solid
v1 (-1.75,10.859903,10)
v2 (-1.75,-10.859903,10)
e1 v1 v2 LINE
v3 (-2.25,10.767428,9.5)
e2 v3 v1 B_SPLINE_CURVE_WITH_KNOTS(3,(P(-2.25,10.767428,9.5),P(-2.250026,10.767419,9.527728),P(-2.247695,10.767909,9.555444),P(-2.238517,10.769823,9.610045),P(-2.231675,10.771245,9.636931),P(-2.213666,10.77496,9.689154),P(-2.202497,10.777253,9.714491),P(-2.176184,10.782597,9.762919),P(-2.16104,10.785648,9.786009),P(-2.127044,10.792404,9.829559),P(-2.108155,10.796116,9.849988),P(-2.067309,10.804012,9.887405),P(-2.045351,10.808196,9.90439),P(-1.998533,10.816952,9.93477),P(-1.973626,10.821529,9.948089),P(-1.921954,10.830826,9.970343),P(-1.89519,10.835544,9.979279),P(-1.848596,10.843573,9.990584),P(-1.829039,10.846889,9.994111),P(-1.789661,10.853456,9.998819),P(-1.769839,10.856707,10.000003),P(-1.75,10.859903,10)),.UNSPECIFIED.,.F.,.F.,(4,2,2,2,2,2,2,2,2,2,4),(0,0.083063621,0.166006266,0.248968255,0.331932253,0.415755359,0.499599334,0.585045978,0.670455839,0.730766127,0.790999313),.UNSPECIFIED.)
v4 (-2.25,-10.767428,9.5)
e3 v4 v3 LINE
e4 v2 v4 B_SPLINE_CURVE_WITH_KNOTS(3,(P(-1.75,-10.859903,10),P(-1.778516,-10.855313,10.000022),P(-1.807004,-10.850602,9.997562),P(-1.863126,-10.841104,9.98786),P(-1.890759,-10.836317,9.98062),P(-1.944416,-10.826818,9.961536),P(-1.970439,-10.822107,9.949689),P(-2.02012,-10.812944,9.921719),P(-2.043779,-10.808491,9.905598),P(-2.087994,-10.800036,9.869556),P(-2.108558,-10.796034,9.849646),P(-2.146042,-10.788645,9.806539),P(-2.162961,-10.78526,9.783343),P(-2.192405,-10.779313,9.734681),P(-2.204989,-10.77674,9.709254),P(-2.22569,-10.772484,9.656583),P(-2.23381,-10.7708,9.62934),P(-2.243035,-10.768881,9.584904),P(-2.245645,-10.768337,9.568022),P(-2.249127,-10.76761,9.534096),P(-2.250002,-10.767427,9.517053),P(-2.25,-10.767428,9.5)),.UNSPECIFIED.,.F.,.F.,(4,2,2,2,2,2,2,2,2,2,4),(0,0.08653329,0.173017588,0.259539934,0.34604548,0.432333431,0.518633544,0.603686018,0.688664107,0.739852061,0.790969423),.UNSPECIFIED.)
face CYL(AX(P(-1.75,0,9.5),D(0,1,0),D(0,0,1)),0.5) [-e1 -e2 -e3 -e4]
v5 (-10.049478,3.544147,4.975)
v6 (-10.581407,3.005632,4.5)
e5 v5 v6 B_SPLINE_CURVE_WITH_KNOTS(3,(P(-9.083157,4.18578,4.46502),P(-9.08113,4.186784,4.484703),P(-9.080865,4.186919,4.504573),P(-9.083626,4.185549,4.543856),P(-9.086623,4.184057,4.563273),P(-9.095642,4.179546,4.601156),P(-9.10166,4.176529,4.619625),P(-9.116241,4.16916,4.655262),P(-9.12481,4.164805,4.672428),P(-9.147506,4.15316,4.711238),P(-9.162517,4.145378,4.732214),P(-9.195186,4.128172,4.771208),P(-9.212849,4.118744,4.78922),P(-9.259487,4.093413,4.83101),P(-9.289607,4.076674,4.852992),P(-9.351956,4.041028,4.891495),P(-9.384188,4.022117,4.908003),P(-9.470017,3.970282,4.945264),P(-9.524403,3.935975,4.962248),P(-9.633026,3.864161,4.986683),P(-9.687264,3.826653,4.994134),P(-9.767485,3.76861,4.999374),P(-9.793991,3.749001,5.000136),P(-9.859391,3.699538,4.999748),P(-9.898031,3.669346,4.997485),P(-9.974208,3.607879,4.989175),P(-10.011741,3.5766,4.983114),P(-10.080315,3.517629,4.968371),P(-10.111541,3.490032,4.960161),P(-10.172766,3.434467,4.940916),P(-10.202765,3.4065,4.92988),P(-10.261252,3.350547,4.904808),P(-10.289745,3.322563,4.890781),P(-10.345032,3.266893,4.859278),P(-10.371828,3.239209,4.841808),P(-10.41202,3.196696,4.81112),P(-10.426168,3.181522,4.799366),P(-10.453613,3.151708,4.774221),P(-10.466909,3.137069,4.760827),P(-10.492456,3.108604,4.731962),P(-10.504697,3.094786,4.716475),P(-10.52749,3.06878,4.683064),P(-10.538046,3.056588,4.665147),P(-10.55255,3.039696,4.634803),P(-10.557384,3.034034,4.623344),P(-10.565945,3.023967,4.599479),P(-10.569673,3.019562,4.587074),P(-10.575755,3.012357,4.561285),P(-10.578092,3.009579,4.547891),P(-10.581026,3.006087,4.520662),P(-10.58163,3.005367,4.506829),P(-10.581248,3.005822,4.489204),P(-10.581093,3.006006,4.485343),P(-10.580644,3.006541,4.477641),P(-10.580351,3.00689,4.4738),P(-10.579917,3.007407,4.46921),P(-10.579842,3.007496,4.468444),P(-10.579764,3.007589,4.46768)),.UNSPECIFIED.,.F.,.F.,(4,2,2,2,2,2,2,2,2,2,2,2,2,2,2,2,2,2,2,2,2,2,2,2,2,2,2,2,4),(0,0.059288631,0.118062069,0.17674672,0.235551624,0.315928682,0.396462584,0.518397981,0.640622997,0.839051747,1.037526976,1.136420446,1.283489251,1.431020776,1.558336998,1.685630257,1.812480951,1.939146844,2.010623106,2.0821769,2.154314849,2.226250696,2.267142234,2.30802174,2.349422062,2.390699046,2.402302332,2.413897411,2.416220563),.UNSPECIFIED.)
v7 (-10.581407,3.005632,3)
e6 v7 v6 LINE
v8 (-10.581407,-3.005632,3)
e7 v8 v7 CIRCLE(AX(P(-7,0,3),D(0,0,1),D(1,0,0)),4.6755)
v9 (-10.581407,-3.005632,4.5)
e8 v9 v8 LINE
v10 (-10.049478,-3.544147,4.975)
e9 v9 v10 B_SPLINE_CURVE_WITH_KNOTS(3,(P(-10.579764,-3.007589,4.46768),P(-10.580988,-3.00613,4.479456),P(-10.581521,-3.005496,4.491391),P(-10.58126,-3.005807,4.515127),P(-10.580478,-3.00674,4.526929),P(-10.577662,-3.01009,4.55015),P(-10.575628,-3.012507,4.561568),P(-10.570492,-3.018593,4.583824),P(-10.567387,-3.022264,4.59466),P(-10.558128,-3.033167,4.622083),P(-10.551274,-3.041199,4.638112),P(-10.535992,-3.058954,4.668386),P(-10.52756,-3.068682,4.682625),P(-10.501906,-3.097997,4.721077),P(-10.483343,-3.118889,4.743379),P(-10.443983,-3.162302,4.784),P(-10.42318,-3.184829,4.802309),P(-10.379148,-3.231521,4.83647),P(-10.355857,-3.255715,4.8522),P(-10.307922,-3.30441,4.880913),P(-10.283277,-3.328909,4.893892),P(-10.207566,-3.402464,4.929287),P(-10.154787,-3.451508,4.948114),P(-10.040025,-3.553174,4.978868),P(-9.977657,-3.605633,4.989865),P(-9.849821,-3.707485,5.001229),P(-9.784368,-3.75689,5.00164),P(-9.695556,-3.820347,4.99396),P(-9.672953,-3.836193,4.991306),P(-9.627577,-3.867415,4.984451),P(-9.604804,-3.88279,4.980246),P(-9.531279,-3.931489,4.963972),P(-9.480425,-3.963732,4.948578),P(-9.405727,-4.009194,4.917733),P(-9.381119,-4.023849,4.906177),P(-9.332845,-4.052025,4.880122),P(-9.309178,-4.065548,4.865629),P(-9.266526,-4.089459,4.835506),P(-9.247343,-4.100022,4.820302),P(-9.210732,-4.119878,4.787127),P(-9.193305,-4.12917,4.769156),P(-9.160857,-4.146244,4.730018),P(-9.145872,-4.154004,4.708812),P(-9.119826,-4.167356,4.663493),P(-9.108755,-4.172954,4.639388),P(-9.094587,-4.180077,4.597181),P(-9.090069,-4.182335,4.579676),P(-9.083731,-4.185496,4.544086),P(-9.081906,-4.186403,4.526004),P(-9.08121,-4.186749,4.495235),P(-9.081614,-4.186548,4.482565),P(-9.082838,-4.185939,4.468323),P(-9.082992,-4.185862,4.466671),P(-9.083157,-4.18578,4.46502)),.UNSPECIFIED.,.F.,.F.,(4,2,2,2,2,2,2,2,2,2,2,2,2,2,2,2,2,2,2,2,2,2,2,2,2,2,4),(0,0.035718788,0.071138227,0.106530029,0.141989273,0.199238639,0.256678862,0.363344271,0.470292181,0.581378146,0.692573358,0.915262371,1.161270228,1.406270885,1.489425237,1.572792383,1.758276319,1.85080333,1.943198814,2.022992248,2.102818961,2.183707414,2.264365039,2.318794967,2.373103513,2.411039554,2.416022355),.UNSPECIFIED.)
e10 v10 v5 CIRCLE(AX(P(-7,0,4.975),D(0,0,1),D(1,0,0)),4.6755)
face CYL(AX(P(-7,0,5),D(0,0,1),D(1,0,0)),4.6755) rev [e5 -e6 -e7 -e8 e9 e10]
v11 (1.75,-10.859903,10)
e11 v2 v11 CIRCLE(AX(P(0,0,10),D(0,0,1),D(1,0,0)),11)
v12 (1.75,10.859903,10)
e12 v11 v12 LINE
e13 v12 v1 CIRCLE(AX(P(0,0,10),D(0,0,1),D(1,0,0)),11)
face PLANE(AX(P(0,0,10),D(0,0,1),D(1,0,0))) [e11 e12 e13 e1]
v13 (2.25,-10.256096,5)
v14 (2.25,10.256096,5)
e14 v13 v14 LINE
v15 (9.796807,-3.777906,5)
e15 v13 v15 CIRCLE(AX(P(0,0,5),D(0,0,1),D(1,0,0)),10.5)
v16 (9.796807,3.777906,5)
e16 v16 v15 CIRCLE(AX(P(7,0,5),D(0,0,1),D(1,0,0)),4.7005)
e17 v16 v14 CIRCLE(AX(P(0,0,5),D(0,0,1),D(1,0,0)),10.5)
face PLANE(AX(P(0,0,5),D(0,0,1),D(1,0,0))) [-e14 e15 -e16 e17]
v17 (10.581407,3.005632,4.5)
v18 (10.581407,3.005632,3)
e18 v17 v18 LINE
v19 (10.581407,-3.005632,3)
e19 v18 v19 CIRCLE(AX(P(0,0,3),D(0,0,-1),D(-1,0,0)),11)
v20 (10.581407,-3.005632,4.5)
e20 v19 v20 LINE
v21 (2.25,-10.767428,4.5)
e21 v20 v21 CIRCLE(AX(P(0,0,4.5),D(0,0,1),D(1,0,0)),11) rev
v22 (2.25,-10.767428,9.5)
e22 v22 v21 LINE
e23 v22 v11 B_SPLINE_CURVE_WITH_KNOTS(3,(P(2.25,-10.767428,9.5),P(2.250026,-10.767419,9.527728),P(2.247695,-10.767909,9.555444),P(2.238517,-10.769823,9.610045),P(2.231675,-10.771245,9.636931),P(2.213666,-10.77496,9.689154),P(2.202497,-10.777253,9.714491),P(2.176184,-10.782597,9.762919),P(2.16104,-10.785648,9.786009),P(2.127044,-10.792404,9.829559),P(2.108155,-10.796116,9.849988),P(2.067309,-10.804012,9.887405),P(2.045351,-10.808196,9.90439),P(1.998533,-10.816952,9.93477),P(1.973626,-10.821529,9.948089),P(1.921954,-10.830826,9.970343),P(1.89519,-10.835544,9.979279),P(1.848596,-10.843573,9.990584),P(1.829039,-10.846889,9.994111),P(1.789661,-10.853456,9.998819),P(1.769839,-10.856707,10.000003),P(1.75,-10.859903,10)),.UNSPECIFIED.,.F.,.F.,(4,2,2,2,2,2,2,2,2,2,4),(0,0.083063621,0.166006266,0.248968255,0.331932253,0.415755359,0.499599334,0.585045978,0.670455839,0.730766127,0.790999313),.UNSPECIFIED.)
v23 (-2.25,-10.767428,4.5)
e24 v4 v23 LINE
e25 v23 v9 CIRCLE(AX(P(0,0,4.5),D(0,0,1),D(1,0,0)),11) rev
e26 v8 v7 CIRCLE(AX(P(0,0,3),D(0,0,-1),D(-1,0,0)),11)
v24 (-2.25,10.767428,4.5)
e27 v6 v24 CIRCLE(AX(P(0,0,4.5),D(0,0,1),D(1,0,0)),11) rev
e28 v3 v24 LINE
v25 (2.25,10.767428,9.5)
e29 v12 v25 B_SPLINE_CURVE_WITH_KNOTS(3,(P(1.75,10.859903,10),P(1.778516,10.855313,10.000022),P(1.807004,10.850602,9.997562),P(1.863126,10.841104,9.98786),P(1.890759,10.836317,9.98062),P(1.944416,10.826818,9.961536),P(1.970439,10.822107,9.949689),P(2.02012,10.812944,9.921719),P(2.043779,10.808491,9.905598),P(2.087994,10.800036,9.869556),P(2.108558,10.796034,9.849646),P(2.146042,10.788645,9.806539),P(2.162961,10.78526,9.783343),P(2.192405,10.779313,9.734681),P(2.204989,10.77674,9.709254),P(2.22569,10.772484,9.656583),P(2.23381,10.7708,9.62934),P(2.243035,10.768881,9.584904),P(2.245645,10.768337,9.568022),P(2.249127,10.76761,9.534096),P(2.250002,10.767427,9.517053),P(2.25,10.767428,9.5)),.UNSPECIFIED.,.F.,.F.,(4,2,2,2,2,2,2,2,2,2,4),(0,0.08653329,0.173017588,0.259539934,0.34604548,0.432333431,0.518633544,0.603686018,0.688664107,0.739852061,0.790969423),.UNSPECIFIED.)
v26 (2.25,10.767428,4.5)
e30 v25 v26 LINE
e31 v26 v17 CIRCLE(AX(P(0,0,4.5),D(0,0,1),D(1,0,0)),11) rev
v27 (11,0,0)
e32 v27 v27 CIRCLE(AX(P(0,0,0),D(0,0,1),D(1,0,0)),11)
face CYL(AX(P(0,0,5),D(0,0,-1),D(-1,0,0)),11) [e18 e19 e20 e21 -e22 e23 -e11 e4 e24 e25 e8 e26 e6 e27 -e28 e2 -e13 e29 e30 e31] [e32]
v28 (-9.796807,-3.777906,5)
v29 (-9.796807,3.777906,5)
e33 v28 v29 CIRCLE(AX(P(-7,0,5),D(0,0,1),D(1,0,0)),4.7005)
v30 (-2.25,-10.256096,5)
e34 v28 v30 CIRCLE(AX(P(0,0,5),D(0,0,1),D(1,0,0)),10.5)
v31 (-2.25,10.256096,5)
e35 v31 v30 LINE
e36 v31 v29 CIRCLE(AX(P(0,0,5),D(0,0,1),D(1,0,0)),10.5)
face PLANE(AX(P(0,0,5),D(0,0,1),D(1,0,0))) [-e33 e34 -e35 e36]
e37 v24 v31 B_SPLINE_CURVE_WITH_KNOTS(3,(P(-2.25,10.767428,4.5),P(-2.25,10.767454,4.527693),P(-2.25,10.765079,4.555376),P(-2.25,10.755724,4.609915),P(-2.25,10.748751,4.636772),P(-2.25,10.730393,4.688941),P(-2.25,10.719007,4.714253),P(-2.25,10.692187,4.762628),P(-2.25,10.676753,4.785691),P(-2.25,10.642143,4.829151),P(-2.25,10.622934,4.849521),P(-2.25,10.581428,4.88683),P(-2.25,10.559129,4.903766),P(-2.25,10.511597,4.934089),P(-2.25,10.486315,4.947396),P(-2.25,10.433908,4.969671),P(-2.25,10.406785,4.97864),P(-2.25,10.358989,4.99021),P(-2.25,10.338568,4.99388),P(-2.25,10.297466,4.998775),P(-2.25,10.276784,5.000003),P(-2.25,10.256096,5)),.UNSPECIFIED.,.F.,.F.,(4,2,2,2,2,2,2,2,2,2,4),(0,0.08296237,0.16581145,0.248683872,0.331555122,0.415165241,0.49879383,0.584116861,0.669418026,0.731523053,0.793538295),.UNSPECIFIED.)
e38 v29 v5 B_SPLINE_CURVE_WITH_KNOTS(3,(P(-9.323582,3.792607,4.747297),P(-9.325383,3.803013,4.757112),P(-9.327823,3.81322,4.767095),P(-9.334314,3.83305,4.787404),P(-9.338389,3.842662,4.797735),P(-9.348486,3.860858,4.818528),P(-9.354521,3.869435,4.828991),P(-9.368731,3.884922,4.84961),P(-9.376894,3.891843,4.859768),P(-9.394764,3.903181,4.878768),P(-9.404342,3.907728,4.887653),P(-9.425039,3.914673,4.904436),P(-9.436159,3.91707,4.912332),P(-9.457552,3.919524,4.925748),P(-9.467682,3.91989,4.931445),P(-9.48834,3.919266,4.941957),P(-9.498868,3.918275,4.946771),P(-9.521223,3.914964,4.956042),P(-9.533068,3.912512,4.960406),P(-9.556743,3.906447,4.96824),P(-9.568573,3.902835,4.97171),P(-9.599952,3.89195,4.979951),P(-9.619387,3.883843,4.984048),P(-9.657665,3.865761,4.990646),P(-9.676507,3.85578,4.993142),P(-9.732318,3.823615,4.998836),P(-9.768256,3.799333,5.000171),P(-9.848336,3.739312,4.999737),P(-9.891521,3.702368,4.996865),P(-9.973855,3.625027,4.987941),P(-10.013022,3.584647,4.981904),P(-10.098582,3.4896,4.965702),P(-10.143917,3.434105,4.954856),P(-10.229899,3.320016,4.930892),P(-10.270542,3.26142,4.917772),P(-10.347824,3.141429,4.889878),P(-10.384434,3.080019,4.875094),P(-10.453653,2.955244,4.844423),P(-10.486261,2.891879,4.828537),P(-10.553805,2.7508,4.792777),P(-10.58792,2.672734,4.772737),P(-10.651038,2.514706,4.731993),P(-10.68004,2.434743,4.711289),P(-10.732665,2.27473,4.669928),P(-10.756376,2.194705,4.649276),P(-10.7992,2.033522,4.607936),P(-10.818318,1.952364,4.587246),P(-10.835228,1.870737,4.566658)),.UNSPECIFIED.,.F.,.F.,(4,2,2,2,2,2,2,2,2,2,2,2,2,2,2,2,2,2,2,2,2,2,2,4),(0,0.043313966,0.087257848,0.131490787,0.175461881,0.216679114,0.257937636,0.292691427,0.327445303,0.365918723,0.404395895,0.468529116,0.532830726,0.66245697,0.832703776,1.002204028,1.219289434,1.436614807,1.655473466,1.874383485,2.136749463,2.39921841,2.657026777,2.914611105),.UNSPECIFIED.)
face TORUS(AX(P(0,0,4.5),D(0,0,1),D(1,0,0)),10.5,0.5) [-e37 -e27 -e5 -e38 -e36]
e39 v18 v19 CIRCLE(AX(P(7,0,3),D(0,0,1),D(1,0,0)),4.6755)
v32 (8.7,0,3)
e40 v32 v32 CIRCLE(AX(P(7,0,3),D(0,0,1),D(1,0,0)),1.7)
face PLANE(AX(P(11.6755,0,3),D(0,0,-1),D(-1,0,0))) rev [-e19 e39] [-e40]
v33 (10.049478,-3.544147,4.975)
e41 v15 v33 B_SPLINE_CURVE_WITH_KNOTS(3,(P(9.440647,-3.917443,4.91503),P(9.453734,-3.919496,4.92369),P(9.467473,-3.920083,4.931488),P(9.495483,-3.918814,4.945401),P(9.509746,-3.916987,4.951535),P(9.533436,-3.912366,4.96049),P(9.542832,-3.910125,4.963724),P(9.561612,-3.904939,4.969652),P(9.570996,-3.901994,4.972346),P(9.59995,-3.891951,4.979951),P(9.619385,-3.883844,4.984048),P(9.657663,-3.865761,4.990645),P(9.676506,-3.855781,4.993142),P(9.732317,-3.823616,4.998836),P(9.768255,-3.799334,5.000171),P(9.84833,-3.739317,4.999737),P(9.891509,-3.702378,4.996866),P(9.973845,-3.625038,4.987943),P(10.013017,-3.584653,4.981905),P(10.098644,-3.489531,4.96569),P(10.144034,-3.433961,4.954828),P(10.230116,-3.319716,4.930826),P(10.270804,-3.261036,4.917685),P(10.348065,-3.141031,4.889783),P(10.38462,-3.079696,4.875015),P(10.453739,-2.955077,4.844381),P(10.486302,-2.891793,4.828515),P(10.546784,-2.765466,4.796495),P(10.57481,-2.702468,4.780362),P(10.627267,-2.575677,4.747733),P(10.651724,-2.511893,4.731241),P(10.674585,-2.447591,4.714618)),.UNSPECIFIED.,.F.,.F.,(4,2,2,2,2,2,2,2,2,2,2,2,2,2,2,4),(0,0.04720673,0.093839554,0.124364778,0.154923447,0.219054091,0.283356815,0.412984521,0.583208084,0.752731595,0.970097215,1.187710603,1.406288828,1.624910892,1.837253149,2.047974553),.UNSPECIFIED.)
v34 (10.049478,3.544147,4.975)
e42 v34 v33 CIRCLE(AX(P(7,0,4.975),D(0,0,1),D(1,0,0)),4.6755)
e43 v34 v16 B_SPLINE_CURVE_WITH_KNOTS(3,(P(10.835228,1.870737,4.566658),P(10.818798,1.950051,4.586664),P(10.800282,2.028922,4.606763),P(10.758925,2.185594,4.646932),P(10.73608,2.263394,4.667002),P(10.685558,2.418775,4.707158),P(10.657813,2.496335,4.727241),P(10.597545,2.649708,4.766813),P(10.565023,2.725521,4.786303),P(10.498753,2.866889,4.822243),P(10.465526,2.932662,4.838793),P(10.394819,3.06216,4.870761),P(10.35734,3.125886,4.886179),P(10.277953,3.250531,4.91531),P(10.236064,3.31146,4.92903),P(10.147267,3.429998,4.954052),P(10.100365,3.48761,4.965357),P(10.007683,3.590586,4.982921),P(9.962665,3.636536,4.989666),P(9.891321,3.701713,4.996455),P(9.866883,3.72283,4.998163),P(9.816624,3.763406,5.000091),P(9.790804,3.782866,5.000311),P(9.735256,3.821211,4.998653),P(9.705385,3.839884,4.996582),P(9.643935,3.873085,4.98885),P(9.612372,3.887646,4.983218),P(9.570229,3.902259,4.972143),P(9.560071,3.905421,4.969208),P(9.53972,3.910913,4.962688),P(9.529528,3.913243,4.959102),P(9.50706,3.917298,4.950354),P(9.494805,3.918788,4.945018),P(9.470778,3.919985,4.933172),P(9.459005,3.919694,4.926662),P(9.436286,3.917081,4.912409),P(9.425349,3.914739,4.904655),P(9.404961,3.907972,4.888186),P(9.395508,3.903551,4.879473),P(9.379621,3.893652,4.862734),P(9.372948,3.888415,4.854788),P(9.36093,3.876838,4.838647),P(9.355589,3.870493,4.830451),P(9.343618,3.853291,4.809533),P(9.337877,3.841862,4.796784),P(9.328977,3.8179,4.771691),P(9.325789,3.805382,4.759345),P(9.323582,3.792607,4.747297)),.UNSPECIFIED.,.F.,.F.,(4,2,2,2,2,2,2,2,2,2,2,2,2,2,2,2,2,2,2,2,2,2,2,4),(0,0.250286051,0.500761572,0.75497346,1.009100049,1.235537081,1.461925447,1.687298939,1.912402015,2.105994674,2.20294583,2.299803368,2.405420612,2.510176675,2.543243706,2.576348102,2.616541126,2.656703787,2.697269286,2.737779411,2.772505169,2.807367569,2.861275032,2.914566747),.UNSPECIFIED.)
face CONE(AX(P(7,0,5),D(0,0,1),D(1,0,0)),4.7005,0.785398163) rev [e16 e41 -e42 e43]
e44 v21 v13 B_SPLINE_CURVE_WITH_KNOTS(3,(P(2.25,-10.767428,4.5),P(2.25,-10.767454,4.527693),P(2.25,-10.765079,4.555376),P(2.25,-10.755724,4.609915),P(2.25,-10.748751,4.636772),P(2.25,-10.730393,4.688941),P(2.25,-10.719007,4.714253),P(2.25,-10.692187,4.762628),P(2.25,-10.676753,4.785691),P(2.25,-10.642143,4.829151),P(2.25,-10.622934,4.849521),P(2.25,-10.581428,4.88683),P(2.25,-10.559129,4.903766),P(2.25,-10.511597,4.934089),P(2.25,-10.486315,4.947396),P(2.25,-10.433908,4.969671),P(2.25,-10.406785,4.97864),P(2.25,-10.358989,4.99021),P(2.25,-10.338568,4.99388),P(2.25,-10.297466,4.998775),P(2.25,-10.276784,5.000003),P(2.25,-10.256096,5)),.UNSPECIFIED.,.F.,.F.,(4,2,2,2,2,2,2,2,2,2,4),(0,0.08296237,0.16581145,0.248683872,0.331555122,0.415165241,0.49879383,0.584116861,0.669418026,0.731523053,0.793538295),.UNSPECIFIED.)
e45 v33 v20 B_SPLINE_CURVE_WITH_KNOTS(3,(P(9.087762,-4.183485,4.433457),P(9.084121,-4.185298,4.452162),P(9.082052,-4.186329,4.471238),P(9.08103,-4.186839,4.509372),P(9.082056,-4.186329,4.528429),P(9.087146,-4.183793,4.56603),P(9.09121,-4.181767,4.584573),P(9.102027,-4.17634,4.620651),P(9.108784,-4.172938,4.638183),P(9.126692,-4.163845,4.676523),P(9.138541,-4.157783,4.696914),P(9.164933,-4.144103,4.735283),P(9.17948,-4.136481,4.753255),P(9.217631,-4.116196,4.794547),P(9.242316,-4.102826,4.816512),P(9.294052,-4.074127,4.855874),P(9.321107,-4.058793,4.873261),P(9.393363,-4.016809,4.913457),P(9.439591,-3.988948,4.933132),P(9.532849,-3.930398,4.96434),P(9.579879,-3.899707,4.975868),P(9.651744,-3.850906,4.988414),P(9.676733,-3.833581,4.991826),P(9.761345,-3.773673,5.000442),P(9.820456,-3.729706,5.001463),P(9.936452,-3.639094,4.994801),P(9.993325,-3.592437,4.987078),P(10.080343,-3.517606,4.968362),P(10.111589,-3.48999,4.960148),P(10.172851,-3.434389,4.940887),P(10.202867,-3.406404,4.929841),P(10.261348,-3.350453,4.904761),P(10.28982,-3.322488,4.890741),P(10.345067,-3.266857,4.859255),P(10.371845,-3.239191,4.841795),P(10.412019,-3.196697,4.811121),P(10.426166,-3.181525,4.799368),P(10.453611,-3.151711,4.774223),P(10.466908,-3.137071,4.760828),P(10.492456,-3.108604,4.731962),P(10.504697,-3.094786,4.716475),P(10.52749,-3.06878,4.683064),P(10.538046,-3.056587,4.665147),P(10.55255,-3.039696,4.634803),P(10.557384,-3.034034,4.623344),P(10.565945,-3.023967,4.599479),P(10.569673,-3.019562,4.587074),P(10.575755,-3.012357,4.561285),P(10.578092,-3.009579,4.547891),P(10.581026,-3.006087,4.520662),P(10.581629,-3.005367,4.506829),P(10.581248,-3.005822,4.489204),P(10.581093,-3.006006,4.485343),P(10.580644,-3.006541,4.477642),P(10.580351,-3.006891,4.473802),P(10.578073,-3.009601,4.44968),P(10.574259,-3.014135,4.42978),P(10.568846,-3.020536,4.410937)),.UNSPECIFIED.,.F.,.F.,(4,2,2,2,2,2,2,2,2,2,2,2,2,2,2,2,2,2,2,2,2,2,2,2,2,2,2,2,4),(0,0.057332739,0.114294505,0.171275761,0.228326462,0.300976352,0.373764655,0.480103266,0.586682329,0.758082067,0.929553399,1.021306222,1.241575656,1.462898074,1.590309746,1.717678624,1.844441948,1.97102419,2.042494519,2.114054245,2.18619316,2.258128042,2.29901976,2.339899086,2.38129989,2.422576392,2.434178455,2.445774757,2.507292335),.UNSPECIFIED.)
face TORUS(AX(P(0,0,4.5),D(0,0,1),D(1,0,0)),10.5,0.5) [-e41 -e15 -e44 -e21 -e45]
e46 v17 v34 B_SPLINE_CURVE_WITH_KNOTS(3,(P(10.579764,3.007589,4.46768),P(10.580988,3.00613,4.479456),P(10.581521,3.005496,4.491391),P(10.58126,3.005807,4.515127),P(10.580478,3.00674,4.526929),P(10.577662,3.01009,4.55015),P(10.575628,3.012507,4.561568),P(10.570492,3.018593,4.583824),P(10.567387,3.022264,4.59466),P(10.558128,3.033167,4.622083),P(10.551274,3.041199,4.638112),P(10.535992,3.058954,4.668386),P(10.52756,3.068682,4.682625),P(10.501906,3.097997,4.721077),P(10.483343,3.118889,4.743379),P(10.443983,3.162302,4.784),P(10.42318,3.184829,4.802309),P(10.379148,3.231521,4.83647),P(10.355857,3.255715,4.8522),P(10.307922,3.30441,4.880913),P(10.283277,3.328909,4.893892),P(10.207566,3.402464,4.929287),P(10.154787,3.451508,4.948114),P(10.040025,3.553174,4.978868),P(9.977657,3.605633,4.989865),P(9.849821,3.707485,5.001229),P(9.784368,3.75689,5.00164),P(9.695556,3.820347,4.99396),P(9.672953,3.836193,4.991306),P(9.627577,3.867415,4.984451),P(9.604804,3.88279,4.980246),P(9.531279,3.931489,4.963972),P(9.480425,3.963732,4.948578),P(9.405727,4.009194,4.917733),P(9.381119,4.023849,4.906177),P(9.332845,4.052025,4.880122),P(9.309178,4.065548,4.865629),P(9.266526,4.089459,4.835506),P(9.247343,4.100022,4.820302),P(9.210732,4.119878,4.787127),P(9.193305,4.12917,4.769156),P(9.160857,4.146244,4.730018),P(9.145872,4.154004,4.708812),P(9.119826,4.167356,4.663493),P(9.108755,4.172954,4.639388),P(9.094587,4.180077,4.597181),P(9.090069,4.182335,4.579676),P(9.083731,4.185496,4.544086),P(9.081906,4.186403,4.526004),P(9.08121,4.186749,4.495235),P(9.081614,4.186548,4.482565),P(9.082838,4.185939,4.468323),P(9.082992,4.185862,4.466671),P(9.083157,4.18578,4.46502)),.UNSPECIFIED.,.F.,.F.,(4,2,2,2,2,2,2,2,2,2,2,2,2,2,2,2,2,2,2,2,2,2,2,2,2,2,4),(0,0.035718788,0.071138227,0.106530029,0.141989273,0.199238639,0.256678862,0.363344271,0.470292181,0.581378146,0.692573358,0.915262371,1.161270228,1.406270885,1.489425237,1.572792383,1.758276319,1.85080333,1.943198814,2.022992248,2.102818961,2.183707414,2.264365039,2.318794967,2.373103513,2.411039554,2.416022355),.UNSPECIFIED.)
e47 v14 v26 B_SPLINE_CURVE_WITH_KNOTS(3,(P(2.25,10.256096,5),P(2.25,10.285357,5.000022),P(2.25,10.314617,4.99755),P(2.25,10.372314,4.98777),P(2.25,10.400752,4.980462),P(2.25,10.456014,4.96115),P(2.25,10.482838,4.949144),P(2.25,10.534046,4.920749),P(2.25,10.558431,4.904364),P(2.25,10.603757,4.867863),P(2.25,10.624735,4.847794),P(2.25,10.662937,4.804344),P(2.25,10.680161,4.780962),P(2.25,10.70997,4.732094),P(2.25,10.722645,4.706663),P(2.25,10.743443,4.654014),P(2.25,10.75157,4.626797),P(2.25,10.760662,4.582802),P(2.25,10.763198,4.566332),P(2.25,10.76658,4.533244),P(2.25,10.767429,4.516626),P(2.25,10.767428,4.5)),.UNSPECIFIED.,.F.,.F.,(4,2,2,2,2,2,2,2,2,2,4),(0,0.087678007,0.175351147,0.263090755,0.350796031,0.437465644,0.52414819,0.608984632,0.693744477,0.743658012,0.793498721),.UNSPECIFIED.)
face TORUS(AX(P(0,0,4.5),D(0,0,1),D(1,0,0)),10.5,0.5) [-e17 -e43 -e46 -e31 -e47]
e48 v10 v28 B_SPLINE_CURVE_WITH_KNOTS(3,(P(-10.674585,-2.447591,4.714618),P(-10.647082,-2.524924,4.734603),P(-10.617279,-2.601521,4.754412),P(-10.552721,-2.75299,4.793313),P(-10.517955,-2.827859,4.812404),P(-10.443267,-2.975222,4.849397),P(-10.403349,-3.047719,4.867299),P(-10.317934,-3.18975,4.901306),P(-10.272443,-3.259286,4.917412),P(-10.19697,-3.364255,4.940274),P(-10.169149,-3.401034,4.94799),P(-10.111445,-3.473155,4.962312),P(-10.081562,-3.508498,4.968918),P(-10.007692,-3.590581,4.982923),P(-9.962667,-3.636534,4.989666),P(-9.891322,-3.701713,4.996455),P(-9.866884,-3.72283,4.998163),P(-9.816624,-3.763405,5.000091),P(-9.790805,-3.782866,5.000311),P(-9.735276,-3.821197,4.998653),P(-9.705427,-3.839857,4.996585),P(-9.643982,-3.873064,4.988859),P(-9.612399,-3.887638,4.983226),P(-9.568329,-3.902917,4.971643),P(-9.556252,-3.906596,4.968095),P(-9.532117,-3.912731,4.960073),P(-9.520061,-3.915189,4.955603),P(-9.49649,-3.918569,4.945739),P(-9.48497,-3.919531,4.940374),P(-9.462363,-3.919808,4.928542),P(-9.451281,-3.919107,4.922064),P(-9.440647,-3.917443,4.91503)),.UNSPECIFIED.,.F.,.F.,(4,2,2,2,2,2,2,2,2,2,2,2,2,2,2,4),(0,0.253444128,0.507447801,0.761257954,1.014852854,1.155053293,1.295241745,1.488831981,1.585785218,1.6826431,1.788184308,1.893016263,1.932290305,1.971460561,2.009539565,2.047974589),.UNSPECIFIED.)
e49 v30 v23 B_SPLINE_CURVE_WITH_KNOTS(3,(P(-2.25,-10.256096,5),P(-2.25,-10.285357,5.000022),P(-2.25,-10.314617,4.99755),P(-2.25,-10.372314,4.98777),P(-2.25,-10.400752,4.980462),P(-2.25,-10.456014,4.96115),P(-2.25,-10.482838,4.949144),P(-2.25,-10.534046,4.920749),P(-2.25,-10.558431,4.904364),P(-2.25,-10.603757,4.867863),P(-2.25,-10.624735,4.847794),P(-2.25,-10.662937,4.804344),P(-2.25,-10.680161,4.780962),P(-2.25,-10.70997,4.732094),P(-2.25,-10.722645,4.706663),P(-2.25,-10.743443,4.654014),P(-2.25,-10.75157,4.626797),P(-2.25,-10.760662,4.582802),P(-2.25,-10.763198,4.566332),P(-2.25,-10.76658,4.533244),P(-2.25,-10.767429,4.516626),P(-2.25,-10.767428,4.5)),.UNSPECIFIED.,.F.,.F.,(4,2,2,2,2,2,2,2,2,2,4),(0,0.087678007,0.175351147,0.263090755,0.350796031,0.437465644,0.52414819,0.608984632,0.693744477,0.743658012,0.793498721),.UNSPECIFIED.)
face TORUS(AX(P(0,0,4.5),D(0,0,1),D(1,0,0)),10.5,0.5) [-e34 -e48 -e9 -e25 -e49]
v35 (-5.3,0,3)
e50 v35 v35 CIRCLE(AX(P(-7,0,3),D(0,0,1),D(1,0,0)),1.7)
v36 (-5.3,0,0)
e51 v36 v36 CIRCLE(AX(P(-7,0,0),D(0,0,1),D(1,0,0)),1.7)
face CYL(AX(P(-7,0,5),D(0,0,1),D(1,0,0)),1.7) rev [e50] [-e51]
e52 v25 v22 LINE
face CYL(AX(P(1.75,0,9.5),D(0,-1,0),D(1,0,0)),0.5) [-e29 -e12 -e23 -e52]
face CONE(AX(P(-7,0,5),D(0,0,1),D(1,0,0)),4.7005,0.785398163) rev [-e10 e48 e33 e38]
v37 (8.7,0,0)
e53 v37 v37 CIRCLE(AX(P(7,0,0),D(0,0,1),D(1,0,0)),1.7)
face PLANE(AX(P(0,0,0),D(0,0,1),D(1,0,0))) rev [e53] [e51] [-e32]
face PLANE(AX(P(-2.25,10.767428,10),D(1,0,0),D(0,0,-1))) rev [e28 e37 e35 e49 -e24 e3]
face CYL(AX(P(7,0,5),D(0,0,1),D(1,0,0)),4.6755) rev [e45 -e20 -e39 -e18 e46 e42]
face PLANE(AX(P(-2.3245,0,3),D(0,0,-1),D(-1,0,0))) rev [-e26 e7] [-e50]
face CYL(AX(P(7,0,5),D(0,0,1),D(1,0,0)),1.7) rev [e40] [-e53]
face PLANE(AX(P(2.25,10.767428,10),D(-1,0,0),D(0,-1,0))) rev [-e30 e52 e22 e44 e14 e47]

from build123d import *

# Parameters (mm, degrees)
ESQUISSE1_R                                = 11
BOSS_EXTRU_1_DEPTH                         = 5
BOSS_EXTRU_2_DEPTH                         = 5
CONG_1_R                                   = 0.5
CONG_2_R                                   = 0.5
CHAMBRAGE_POUR_VIS_T_TE_HEXAGONALE_2_COUNT = 2
CHAMBRAGE_POUR_VIS_T_TE_HEXAGONALE_2_PITCH = 14


with BuildPart() as part:
    # Esquisse1 → Boss.-Extru.1 (new body)
    with BuildSketch(Plane.XY):
        Circle(ESQUISSE1_R)
    extrude(amount=BOSS_EXTRU_1_DEPTH)

    # Esquisse2 → Boss.-Extru.2 (add)
    with BuildSketch(Plane.XY.offset(5)):
        with BuildLine():
            Line((-2.25, 10.767427734), (-2.25, -10.767427734))
            ThreePointArc((-2.25, -10.767427734), (0, -11), (2.25, -10.767427734))
            Line((2.25, -10.767427734), (2.25, 10.767427734))
            ThreePointArc((2.25, 10.767427734), (0, 11), (-2.25, 10.767427734))
        make_face()
    extrude(amount=BOSS_EXTRU_2_DEPTH)

    # Congé1
    # the kernel refuses this fillet: 0.5 mm, written as the material it takes off along each edge
    with BuildSketch(Plane(origin=(0, 0, 5), x_dir=(1, 0, 0), z_dir=(0, -1, 0))) as cong_1_piece_1_section:
        with BuildLine():
            CenterArc((11 - CONG_1_R, -CONG_1_R), CONG_1_R, 0, 90)
            Line((11 - CONG_1_R, 0), (11, 0))
            Line((11, 0), (11, -CONG_1_R))
        make_face()
    cong_1_piece_1 = revolve(axis=Axis((0, 0, 5), (0, 0, 1)), revolution_arc=84.709966663, mode=Mode.PRIVATE)
    cong_1_piece_1 = split(cong_1_piece_1, bisect_by=Plane(origin=(2.25, 6.849238197, 4.860494097), z_dir=(1, 0, 0)), keep=Keep.TOP, mode=Mode.PRIVATE)
    add(cong_1_piece_1, mode=Mode.SUBTRACT)
    with BuildSketch(Plane(origin=(0, 0, 5), x_dir=(-0.09209435598591774, 0.9957502847579502, 0), z_dir=(0.9957502847579502, 0.09209435598591774, 0))) as cong_1_piece_2_section:
        with BuildLine():
            CenterArc((11 - CONG_1_R, -CONG_1_R), CONG_1_R, 0, 90)
            Line((11 - CONG_1_R, 0), (11, 0))
            Line((11, 0), (11, -CONG_1_R))
        make_face()
    cong_1_piece_2 = revolve(axis=Axis((0, 0, 5), (0, 0, 1)), revolution_arc=169.431789296, mode=Mode.PRIVATE)
    cong_1_piece_2 = split(cong_1_piece_2, bisect_by=Plane(origin=(-2.25, 0, 4.86229808), z_dir=(-1, 0, 0)), keep=Keep.TOP, mode=Mode.PRIVATE)
    add(cong_1_piece_2, mode=Mode.SUBTRACT)
    with BuildSketch(Plane(origin=(0, 0, 5), x_dir=(0.09219737865829941, -0.9957407510836032, 0), z_dir=(-0.9957407510836032, -0.09219737865829941, 0))) as cong_1_piece_3_section:
        with BuildLine():
            CenterArc((11 - CONG_1_R, -CONG_1_R), CONG_1_R, 0, 90)
            Line((11 - CONG_1_R, 0), (11, 0))
            Line((11, 0), (11, -CONG_1_R))
        make_face()
    cong_1_piece_3 = revolve(axis=Axis((0, 0, 5), (0, 0, 1)), revolution_arc=84.709966663, mode=Mode.PRIVATE)
    cong_1_piece_3 = split(cong_1_piece_3, bisect_by=Plane(origin=(2.25, -6.849238209, 4.860494116), z_dir=(1, 0, 0)), keep=Keep.TOP, mode=Mode.PRIVATE)
    add(cong_1_piece_3, mode=Mode.SUBTRACT)

    # Congé2
    cong_2_edges = [part.edges().sort_by_distance(p)[0] for p in [
        (-2.25, 0, 10),
        (2.25, 0, 10),
    ]]
    fillet(cong_2_edges, radius=CONG_2_R)

    # Esquisse4 → Chambrage pour vis à tête hexagonale M31 (revolve, cut)
    with BuildSketch(Plane(origin=(-7, 0, 5), x_dir=(0, -1, 0), z_dir=(1, 0, 0))):
        Polygon((0, 0), (0, 5), (1.7, 5), (1.7, 2), (4.6755, 2), (4.6755, 0.025), (4.7005, 0), align=None)
    chambrage_pour_vis_t_te_hexagonale_m31 = revolve(axis=Axis((-7, 0, 11.35), (0, 0, -1)), mode=Mode.SUBTRACT)

    # Chambrage pour vis _ t_te hexagonale 2: Chambrage pour vis à tête hexagonale M31 ×2
    with Locations(*[(i * CHAMBRAGE_POUR_VIS_T_TE_HEXAGONALE_2_PITCH, 0, 0) for i in range(1, CHAMBRAGE_POUR_VIS_T_TE_HEXAGONALE_2_COUNT)]):
        add(chambrage_pour_vis_t_te_hexagonale_m31, mode=Mode.SUBTRACT)


solid = part.part
